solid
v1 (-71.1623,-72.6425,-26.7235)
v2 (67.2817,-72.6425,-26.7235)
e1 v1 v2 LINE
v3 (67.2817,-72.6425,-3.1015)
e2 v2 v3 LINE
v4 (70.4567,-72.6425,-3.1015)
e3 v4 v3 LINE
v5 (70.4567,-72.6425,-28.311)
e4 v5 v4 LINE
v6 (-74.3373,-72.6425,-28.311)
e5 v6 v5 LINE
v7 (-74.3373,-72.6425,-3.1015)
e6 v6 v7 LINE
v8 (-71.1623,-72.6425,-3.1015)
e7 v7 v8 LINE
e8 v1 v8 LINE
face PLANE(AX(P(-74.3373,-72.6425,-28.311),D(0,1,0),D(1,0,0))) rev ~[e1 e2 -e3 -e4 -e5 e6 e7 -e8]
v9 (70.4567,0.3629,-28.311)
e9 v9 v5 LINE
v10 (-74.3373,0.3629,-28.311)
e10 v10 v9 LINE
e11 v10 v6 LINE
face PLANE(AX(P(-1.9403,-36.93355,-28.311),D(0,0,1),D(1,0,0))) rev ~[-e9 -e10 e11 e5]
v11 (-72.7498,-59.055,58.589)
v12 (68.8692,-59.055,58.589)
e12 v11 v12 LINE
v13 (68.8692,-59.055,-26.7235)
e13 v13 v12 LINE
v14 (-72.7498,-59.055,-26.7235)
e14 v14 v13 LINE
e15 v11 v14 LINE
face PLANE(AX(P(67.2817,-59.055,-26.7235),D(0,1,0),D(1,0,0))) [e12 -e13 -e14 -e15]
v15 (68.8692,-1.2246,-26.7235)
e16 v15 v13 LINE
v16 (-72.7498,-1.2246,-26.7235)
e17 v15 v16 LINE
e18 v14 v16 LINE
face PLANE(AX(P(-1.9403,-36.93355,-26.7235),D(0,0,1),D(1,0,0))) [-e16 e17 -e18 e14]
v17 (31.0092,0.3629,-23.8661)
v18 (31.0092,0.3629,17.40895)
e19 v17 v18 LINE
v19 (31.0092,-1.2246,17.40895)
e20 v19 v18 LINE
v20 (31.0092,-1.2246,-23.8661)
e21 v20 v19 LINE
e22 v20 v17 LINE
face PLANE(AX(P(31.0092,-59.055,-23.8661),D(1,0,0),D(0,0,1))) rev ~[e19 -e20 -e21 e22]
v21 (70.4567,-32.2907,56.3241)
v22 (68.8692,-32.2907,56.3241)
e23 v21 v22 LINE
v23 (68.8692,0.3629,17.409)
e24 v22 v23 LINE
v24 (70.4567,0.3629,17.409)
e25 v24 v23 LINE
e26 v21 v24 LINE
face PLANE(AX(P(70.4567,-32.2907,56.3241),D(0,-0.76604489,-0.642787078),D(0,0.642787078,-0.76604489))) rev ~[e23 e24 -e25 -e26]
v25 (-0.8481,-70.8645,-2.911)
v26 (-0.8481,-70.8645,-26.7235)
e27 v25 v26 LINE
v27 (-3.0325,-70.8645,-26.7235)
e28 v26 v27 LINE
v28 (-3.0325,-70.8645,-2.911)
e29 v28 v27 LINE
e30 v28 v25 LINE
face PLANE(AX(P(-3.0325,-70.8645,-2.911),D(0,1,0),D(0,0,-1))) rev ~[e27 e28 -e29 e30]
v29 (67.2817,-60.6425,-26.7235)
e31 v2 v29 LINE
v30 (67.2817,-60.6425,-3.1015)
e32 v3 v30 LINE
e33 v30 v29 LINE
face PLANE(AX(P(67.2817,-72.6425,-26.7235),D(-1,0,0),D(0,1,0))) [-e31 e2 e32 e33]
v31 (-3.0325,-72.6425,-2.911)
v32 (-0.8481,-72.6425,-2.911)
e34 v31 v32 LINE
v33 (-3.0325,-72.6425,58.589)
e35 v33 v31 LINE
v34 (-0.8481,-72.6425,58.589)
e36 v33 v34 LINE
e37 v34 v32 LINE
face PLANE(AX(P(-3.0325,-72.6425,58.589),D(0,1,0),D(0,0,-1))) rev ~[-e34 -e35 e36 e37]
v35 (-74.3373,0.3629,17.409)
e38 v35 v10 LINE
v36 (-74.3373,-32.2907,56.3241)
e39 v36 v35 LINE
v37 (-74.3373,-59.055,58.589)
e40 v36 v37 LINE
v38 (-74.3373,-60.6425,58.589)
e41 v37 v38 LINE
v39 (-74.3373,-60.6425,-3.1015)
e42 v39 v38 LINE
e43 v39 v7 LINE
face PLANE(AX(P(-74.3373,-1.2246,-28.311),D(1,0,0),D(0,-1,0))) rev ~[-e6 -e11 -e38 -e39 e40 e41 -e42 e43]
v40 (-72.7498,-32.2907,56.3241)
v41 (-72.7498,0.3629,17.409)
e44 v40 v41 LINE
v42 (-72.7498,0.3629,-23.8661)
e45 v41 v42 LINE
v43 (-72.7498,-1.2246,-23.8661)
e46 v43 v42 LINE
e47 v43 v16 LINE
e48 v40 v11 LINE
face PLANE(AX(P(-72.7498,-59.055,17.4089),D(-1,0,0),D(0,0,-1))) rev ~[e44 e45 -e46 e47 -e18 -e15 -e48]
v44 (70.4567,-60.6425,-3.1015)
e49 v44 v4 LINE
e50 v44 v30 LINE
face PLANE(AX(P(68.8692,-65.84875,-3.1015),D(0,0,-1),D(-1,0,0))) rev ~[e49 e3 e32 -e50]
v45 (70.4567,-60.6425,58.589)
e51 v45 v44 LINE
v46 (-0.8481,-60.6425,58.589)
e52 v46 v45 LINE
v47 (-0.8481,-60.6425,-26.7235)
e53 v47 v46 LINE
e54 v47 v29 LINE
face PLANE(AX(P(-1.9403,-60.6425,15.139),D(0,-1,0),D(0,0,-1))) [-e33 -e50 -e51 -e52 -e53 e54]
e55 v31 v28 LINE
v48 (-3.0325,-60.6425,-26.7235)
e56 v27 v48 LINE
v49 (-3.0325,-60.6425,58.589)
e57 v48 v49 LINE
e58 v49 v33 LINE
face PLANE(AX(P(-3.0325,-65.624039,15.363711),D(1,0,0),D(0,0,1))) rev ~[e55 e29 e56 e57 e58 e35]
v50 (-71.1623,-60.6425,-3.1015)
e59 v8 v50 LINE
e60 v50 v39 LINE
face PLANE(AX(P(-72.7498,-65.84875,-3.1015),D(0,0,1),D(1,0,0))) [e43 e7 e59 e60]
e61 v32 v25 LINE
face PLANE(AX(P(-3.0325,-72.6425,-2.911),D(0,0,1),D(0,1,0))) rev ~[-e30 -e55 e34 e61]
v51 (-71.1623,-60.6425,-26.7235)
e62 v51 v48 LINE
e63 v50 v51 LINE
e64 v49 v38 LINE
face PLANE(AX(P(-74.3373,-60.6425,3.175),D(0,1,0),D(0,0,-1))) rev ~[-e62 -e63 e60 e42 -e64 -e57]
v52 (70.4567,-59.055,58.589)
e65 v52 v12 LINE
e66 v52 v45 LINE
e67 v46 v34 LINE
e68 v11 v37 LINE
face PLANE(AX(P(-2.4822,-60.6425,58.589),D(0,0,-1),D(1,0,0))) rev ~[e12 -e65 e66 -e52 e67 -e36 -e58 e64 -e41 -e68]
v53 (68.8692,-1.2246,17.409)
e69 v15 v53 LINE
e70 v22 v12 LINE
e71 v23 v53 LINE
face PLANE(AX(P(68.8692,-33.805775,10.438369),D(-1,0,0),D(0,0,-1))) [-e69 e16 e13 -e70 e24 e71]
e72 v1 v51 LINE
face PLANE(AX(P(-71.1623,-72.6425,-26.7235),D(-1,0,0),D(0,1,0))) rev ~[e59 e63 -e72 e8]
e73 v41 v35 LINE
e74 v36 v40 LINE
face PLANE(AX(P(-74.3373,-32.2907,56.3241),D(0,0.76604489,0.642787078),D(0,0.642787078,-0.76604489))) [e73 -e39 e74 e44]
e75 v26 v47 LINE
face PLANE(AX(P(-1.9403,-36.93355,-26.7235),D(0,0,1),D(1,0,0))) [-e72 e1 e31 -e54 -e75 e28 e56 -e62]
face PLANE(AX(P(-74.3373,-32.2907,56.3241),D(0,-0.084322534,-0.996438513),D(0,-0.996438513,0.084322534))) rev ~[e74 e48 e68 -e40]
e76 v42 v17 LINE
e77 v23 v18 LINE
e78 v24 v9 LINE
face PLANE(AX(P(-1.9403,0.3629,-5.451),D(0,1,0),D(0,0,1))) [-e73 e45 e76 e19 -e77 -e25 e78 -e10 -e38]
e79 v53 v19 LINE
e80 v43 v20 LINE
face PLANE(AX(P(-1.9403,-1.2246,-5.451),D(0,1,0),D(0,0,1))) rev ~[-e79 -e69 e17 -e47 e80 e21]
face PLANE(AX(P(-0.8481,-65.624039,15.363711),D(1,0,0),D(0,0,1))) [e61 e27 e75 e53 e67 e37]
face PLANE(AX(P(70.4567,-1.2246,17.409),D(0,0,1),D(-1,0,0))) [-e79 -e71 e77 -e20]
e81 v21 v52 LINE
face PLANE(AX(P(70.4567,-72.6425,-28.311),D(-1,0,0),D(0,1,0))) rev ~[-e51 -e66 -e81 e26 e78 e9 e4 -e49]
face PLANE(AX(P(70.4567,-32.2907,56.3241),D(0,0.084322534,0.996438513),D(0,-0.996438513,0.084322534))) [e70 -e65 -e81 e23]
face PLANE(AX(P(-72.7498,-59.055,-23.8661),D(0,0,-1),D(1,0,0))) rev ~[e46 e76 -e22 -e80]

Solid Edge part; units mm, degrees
sketch "Sketch1" plane through (33.0178, -67.9125, -28.311) normal (0, 0, -1) x (1, 0, 0)
  line L0 (-107.3551, -66.6879) -> (-107.3551, 4.73)
  line L1 (-107.3551, 4.73) -> (37.4389, 4.73)
  line L2 (37.4389, 4.73) -> (37.4389, -66.6879)
  line L3 (37.4389, -66.6879) -> (-107.3551, -66.6879)
extrude "bottom" add sketch "Sketch1" against normal blind 1.5875
sketch "Sketch2" plane through (-4.9364, -1.2246, -1.8296) normal (0, 1, 0) x (-1, 0, 0)
  line L0 (-75.3931, 19.2386) -> (-75.3931, 0.7937)
  line L1 (-75.3931, 0.7937) -> (-75.3931, -26.4814)
  line L2 (-75.3931, -26.4814) -> (69.4009, -26.4814)
  line L3 (69.4009, 0.7937) -> (69.4009, -26.4814)
  line L4 (69.4009, 19.2386) -> (69.4009, 0.7937)
  line L5 (-75.3931, 19.2386) -> (69.4009, 19.2386)
extrude "back" add sketch "Sketch2" along normal blind 1.5875
sketch "Sketch3" plane through (33.0178, -60.6425, 33.925) normal (0, 1, 0) x (-1, 0, 0)
  line L0 (35.5, 24.664) -> (107.2281, 24.664)
  line L1 (107.2281, -30.75) -> (107.2281, 24.664)
  line L2 (107.2281, -30.75) -> (107.2281, -62.236)
  line L3 (107.2281, -62.236) -> (-37.3119, -62.236)
  line L4 (-37.3119, -62.236) -> (-37.3119, -30.75)
  line L5 (-37.3119, 24.664) -> (-37.3119, -30.75)
  line L6 (35.5, 24.664) -> (-37.3119, 24.664)
extrude "front_sub_panel" add sketch "Sketch3" along normal blind 1.5875
extrude "front_panel" [suppressed]
sketch "Sketch4" plane through (-3.0325, -72.0075, 33.8361) normal (1, 0, 0) x (0, 0, -1)
  line L0 (-24.7529, -0.635) -> (36.7471, -0.635)
  line L1 (36.7471, -0.635) -> (36.7471, 1.143)
  line L2 (36.7471, 1.143) -> (62.1471, 1.143)
  line L3 (62.1471, 12.9525) -> (62.1471, 1.143)
  line L4 (-24.7529, 12.9525) -> (62.1471, 12.9525)
  line L5 (-24.7529, 12.9525) -> (-24.7529, -0.635)
extrude "Protrusion1" add sketch "Sketch4" along normal up to vertex (2.1844 mm away)
sketch "Sketch5" plane through (-1.9403, -36.9336, -26.7235) normal (0, 0, 1) x (1, 0, 0)
  line L0 (-69.222, -35.7089) -> (-69.222, -22.1214)
  line L1 (-69.222, -22.1214) -> (-72.397, -22.1214)
  line L2 (-72.397, -22.1214) -> (-72.397, -35.7089)
  line L3 (-72.397, -35.7089) -> (-69.222, -35.7089)
  line L4 (69.222, -22.1214) -> (72.397, -22.1214)
  line L5 (72.397, -22.1214) -> (72.397, -35.7089)
  line L6 (72.397, -35.7089) -> (69.222, -35.7089)
  line L7 (69.222, -35.7089) -> (69.222, -22.1214)
  dimension "D1" = 3.175
extrude "sub_panel_sides" add sketch "Sketch5" along normal blind 23.622
sketch "Sketch6" plane through (70.4567, -36.1398, -5.451) normal (1, 0, 0) x (0, 1, 0)
  line L0 (3.8491, 61.7751) -> (36.5027, 22.86)
  line L1 (36.5027, 22.86) -> (36.5027, -22.86)
  line L2 (36.5027, -22.86) -> (-24.5027, -22.86)
  line L3 (-24.5027, 8.626) -> (-24.5027, -22.86)
  line L4 (-24.5027, 64.04) -> (-24.5027, 8.626)
  line L5 (-22.9152, 64.04) -> (-24.5027, 64.04)
  line L6 (3.8491, 61.7751) -> (-22.9152, 64.04)
extrude "ExtrudedProtrusion_7" add sketch "Sketch6" against normal blind 1.5875
sketch "Sketch7" plane through (-74.3373, -36.1398, -5.451) normal (-1, 0, 0) x (0, -1, 0)
  line L0 (22.9152, 64.04) -> (24.5027, 64.04)
  line L1 (-3.8491, 61.7751) -> (22.9152, 64.04)
  line L2 (-3.8491, 61.7751) -> (-36.5027, 22.86)
  line L3 (-36.5027, 22.86) -> (-36.5027, -22.86)
  line L4 (-36.5027, -22.86) -> (24.5027, -22.86)
  line L5 (24.5027, 8.626) -> (24.5027, -22.86)
  line L6 (24.5027, 64.04) -> (24.5027, 8.626)
extrude "ExtrudedProtrusion_8" add sketch "Sketch7" against normal blind 1.5875
sketch "Sketch8" plane through (-1.9403, -59.055, 15.9327) normal (0, 1, 0) x (-1, 0, 0)
  line L0 (-32.9495, -39.7988) -> (-32.9495, 1.4762)
  line L1 (-32.9495, 1.4762) -> (70.8095, 1.4762)
  line L2 (70.8095, 1.4762) -> (70.8095, -39.7988)
  line L3 (70.8095, -39.7988) -> (-32.9495, -39.7988)
extrude "Cutout1" cut sketch "Sketch8" along normal up to next
